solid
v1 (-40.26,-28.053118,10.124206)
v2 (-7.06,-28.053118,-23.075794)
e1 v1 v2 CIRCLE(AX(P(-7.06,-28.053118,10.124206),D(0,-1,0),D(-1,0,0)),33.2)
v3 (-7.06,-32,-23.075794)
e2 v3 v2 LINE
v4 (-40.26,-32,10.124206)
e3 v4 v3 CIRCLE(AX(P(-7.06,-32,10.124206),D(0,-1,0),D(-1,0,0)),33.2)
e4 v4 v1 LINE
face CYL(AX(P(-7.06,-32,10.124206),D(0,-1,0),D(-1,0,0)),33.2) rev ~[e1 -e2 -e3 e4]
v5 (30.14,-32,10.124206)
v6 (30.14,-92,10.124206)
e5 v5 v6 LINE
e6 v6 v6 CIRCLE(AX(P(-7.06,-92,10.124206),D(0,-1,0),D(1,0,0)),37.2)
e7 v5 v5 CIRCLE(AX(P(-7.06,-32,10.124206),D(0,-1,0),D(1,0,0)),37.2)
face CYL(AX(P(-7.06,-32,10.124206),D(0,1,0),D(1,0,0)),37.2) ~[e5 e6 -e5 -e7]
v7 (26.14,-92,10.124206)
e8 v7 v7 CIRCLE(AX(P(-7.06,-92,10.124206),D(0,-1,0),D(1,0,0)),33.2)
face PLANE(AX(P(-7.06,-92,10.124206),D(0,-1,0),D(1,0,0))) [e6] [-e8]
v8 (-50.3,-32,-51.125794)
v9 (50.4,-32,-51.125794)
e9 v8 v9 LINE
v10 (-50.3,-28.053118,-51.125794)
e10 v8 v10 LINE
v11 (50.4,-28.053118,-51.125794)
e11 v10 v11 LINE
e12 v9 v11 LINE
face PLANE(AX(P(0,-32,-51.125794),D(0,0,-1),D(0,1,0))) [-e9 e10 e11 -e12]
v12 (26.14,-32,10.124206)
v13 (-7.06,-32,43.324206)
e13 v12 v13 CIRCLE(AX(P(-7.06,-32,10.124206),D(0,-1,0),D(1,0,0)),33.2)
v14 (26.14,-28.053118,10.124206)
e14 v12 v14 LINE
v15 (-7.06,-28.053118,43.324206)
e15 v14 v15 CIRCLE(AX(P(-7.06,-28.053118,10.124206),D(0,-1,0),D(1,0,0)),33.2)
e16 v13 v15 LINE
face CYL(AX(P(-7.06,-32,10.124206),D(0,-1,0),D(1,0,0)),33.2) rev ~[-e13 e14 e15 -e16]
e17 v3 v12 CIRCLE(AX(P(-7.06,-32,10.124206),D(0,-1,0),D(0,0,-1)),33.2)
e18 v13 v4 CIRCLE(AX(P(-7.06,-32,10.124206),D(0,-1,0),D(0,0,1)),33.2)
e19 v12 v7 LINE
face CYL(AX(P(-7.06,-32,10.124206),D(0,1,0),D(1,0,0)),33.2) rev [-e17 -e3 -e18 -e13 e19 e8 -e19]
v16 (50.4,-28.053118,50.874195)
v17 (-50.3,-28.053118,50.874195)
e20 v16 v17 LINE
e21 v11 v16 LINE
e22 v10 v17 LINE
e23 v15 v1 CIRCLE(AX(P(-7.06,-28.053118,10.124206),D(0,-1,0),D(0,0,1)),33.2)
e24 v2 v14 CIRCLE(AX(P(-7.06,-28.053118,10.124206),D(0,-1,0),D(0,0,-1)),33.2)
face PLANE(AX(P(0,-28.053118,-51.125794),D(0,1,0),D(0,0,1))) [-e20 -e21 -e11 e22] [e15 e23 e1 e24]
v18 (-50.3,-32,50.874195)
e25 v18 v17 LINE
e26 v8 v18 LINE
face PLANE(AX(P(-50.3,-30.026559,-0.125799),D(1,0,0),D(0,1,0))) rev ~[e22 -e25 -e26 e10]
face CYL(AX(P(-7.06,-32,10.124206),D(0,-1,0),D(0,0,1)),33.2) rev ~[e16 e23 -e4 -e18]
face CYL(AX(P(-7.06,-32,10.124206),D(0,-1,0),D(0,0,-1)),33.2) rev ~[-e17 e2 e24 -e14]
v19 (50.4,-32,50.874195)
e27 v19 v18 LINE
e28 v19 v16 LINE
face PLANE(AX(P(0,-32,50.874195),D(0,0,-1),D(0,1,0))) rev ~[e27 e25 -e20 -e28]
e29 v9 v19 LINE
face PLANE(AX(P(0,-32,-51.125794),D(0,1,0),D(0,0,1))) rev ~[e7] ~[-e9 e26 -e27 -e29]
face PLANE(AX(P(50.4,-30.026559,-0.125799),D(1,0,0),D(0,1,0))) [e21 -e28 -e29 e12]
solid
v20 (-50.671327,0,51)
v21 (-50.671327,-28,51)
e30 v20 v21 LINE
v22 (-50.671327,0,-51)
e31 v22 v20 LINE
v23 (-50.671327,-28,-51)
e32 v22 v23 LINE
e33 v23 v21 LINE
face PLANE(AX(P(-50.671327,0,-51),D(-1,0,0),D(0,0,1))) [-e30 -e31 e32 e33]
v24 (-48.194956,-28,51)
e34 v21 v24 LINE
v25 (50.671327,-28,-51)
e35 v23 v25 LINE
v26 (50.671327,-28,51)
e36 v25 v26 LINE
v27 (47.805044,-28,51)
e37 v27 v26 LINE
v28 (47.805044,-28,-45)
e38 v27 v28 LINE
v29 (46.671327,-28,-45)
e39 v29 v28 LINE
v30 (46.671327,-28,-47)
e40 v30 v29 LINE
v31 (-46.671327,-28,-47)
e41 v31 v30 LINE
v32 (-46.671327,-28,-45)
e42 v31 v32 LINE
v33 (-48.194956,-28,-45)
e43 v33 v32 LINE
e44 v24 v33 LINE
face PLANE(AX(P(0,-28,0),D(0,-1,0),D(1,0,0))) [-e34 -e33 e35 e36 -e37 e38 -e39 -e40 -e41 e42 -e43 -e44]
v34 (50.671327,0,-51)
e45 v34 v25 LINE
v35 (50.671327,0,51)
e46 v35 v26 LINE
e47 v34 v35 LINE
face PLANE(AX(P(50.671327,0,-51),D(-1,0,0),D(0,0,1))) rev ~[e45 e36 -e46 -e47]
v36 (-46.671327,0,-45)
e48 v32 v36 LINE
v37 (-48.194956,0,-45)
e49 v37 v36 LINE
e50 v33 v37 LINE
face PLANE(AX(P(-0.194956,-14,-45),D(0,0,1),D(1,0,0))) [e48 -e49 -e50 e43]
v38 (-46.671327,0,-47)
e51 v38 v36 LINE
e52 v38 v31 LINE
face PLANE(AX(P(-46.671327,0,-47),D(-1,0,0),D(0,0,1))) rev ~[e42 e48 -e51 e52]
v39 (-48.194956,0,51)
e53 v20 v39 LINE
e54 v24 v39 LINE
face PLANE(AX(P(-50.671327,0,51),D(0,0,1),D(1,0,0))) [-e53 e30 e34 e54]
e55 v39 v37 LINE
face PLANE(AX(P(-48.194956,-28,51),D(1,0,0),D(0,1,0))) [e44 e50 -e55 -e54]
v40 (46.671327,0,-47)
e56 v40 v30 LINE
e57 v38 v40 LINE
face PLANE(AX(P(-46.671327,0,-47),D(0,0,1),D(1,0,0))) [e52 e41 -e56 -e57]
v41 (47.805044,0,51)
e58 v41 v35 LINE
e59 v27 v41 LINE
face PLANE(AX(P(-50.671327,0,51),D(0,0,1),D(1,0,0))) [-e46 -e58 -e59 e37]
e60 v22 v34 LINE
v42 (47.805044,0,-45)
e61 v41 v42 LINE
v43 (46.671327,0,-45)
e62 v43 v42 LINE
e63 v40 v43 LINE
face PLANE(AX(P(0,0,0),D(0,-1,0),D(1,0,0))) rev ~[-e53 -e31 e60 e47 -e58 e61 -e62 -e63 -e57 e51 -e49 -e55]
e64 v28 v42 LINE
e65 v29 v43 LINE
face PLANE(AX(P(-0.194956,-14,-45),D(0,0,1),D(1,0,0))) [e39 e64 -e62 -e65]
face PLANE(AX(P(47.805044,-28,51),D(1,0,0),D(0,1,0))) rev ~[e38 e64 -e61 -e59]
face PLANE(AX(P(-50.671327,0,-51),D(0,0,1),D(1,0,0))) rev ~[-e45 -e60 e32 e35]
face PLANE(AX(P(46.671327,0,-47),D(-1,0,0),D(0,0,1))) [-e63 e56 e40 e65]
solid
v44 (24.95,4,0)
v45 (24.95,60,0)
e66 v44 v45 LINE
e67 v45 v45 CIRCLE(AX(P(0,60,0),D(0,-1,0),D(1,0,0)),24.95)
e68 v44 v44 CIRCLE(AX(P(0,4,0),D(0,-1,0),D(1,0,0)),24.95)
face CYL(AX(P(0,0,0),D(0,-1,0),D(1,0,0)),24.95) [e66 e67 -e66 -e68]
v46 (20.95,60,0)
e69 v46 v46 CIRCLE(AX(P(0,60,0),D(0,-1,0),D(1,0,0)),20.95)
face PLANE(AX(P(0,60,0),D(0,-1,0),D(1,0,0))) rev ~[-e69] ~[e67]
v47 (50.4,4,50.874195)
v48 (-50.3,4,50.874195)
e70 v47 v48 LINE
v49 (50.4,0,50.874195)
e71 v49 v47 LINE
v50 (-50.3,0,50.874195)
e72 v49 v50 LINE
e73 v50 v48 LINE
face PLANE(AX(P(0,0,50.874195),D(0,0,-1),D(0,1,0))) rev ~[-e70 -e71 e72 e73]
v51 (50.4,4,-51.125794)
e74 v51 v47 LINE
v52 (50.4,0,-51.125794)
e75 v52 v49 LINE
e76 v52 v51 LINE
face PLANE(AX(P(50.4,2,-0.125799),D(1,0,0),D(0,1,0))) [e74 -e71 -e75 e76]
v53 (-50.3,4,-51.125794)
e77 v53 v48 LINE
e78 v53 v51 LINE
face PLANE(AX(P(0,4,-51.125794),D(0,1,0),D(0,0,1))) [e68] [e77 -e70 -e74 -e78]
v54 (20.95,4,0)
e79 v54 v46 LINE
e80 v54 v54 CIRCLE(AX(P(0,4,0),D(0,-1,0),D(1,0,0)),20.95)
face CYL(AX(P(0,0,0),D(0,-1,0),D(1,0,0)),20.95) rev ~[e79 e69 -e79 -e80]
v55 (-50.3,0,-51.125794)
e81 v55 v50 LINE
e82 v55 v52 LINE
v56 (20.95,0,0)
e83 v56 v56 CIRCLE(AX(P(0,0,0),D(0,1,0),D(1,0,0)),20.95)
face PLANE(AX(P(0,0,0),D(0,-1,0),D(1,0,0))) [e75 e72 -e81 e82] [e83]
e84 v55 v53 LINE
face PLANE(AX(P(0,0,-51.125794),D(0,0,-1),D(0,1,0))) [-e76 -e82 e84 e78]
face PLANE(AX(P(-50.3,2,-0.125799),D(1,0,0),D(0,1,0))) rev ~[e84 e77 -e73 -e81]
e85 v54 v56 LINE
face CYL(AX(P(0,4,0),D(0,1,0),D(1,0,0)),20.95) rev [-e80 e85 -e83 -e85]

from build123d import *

# Parameters (mm, degrees)
F0_W          = 101.342654407
F0_H          = 102
F0_W_2        = 93.342654407
F0_H_2        = 94
F1_DEPTH      = 28
F2_W          = 3.946882084
F2_H          = 101.9999885866
F3_DEPTH      = 50.4
F3_DEPTH_BACK = 50.3
F2_W_2        = 4
F4_W          = 96
F4_H          = 28
F5_DEPTH      = 96
F7_DEPTH      = 5
F8_R          = 37.2
F8_R_2        = 33.2
F9_DEPTH      = 60
F10_R         = 24.95
F10_R_2       = 20.95
F11_DEPTH     = 60
F12_DEPTH     = 55.8


with BuildPart() as f1:
    # F0 (on Front) → F1 (new body)
    with BuildSketch(Plane.XZ):
        Rectangle(F0_W, F0_H)
        Rectangle(F0_W_2, F0_H_2, mode=Mode.SUBTRACT)
    extrude(amount=F1_DEPTH)

    # F4 (on face) → F5 (cut)
    with BuildSketch(Plane.XY.offset(51)):
        with Locations((-0.1949560344, -14)):
            Rectangle(F4_W, F4_H)
    extrude(amount=-F5_DEPTH, mode=Mode.SUBTRACT)


with BuildPart() as f3:
    # F2 (on Right) → F3 (new body, two sides)
    with BuildSketch(Plane.YZ) as f3_sk:
        with Locations((-30.026558958, -0.1257993281)):
            Rectangle(F2_W, F2_H)
    extrude(amount=F3_DEPTH)
    extrude(f3_sk.sketch, amount=-F3_DEPTH_BACK)

    # F6 (on face) → F7 (cut)
    with BuildSketch(Plane.XZ.offset(32)):
        with BuildLine():
            Line((-7.06, 10.1242063786), (-7.06, 43.3242063786))
            ThreePointArc((-7.06, 43.3242063786), (-30.5359451354, 33.600151514), (-40.26, 10.1242063786))
            Line((-40.26, 10.1242063786), (-7.06, 10.1242063786))
        make_face()
        with BuildLine():
            ThreePointArc((26.14, 10.1242063786), (16.4159451354, 33.600151514), (-7.06, 43.3242063786))
            Line((-7.06, 43.3242063786), (-7.06, 10.1242063786))
            Line((-7.06, 10.1242063786), (26.14, 10.1242063786))
        make_face()
        with BuildLine():
            Line((26.14, 10.1242063786), (-7.06, 10.1242063786))
            Line((-7.06, 10.1242063786), (-7.06, -23.0757936214))
            ThreePointArc((-7.06, -23.0757936214), (16.4159451354, -13.3517387568), (26.14, 10.1242063786))
        make_face()
        with BuildLine():
            Line((-7.06, -23.0757936214), (-7.06, 10.1242063786))
            Line((-7.06, 10.1242063786), (-40.26, 10.1242063786))
            ThreePointArc((-40.26, 10.1242063786), (-30.5359451354, -13.3517387568), (-7.06, -23.0757936214))
        make_face()
    extrude(amount=-F7_DEPTH, mode=Mode.SUBTRACT)

    # F8 (on face) → F9 (join)
    with BuildSketch(Plane.XZ.offset(32)):
        with Locations((-7.06, 10.1242063786)):
            Circle(F8_R)
        with Locations((-7.06, 10.1242063786)):
            Circle(F8_R_2, mode=Mode.SUBTRACT)
    extrude(amount=F9_DEPTH)


with BuildPart() as f3b:
    # F2 (on Right) → F3, piece 2 (new body, two sides)
    with BuildSketch(Plane.YZ) as f3_2_sk:
        with Locations((2, -0.1257993281)):
            Rectangle(F2_W_2, F2_H)
    extrude(amount=F3_DEPTH)
    extrude(f3_2_sk.sketch, amount=-F3_DEPTH_BACK)

    # F10 (on Front) → F11 (join)
    with BuildSketch(Plane.XZ):
        Circle(F10_R)
        Circle(F10_R_2, mode=Mode.SUBTRACT)
    extrude(amount=-F11_DEPTH)

    # F12 (cut): faces of the model
    f12_faces = [f3b.faces().sort_by_distance(p)[0] for p in [
        (0, 4, 0),
        (0, 4, 0),
    ]]
    extrude(f12_faces, amount=-F12_DEPTH, mode=Mode.SUBTRACT)


solid = Compound([f1.part, f3.part, f3b.part])
